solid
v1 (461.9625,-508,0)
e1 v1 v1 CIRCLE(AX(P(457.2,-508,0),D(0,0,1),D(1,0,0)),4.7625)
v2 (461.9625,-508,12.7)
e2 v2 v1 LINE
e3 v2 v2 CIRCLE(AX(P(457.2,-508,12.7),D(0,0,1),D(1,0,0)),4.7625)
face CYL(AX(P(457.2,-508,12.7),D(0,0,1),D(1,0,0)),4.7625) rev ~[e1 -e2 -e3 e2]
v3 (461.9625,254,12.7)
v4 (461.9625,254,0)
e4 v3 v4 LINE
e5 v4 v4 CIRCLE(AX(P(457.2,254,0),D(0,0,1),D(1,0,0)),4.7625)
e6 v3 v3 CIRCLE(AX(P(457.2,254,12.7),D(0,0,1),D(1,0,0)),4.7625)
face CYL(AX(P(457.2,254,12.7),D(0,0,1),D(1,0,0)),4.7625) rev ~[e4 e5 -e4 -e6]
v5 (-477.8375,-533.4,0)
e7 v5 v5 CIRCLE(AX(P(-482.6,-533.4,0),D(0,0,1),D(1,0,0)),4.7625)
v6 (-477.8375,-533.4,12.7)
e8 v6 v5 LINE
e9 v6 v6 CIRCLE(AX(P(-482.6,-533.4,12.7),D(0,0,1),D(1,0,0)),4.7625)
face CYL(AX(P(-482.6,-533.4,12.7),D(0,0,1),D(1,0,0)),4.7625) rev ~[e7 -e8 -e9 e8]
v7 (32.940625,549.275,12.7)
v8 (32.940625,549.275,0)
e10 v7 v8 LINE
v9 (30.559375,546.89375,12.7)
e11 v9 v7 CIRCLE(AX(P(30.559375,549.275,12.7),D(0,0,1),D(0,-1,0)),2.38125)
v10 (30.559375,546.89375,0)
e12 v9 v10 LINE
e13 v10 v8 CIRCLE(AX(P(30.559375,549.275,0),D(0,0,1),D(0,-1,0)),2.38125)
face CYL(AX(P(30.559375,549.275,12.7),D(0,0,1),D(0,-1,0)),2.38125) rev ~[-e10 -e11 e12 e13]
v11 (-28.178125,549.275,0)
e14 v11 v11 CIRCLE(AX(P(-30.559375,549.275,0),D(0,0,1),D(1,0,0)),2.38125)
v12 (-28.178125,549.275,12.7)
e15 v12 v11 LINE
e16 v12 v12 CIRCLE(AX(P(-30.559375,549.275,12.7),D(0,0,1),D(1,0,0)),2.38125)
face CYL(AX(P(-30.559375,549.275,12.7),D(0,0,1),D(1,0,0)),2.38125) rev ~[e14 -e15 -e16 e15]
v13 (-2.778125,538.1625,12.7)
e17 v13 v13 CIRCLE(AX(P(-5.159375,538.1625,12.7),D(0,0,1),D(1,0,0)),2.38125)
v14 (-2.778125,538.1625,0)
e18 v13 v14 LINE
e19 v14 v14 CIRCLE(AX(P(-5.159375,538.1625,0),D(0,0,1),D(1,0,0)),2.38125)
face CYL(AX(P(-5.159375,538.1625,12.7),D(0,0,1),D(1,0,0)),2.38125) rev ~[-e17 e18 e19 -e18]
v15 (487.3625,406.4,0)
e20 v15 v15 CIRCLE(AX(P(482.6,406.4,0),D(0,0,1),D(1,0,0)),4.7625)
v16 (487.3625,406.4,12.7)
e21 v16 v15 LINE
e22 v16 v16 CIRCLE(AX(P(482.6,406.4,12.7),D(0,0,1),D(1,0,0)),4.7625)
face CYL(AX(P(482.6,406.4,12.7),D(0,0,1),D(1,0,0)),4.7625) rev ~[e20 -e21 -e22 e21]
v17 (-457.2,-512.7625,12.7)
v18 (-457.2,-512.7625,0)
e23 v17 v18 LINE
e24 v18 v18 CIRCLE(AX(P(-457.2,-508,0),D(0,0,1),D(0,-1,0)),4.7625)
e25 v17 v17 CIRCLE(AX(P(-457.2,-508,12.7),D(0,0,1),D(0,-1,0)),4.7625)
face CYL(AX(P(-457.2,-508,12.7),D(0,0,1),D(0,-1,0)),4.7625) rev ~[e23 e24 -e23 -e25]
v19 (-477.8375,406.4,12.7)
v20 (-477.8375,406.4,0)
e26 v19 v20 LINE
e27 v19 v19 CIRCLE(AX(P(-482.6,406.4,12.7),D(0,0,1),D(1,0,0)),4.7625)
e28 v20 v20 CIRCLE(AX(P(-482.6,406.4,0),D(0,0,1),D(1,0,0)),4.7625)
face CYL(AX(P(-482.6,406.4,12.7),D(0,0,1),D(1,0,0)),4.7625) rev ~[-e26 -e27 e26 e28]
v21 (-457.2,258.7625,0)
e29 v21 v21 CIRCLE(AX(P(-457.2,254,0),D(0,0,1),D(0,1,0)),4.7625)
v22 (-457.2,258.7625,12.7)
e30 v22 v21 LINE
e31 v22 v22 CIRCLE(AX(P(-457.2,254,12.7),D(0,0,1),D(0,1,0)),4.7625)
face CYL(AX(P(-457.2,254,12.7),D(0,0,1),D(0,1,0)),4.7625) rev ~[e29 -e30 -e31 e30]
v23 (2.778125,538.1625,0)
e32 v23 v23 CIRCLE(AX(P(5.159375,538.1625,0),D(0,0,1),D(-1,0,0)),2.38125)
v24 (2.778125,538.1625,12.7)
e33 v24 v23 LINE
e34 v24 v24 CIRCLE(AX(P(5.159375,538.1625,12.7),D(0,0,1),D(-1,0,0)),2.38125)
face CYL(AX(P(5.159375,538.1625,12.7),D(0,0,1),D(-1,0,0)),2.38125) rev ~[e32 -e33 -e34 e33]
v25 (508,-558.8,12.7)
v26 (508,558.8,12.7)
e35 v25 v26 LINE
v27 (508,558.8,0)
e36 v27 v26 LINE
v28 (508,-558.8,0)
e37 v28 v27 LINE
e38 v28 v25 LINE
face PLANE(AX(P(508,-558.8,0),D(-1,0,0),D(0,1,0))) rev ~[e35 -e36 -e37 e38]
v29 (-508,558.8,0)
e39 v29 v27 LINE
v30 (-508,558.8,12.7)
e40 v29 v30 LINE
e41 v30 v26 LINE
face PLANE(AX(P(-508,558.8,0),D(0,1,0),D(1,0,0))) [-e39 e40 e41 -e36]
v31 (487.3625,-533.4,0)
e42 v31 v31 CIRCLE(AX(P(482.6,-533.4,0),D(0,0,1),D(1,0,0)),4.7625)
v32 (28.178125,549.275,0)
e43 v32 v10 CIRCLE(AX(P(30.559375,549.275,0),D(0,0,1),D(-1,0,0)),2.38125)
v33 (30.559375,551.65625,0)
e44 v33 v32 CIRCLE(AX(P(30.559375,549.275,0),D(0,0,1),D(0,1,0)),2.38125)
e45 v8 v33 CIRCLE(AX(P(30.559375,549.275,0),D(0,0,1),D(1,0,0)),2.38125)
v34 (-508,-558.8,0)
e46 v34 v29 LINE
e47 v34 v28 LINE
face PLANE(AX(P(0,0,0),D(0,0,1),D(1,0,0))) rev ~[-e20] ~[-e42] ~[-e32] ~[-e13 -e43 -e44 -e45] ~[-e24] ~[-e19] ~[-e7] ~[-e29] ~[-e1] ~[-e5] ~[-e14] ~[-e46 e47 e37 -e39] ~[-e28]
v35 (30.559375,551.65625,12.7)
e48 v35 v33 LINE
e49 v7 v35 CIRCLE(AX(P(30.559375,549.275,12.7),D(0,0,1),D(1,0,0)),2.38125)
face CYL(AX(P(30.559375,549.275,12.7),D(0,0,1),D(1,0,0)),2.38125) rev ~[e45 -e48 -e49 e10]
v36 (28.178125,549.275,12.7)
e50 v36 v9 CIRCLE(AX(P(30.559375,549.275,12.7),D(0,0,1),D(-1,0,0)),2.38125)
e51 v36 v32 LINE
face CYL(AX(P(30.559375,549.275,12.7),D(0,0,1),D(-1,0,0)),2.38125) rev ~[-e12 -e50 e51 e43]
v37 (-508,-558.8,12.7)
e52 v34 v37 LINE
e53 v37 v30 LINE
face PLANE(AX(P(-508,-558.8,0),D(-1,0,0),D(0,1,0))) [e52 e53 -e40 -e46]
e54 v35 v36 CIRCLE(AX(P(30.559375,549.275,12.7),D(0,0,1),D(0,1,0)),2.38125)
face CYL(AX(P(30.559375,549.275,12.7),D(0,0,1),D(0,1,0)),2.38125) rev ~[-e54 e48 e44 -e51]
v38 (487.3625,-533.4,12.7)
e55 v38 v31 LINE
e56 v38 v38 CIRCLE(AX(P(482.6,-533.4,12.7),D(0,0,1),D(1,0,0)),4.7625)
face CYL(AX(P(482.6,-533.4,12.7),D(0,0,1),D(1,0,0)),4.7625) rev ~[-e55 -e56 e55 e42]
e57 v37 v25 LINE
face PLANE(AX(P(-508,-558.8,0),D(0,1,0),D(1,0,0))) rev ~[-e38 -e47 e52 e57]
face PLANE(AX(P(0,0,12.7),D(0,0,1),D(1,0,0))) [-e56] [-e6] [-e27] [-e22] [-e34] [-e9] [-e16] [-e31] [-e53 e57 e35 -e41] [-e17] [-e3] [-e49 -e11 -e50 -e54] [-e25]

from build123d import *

# Parameters (mm, degrees)
F0_W     = 1016
F0_H     = 1117.6
F1_DEPTH = 12.7
F3_DEPTH = 25.4
F4_R     = 4.7625
F5_DEPTH = 25.4


# Not quite as in the source:
# - a feature names something its author has since deleted; it is built from what else it names


with BuildPart() as f1:
    # F0 (on Top) → F1 (new body)
    with BuildSketch(Plane.XY):
        Rectangle(F0_W, F0_H)
    extrude(amount=F1_DEPTH)

    # F2 (on face) → F3 (cut)
    with BuildSketch(Plane.XY.offset(12.7)):
        with BuildLine():
            Line((-30.559375, 549.275), (-30.559375, 551.65625))
            ThreePointArc((-30.559375, 551.65625), (-32.940625, 549.275), (-30.559375, 546.89375))
            Line((-30.559375, 546.89375), (-30.559375, 549.275))
        make_face()
        with BuildLine():
            ThreePointArc((-28.178125, 549.275), (-28.8755769773, 550.9587980227), (-30.559375, 551.65625))
            Line((-30.559375, 551.65625), (-30.559375, 549.275))
            Line((-30.559375, 549.275), (-28.178125, 549.275))
        make_face()
        with BuildLine():
            Line((-28.178125, 549.275), (-30.559375, 549.275))
            Line((-30.559375, 549.275), (-30.559375, 546.89375))
            ThreePointArc((-30.559375, 546.89375), (-28.8755769773, 547.5912019773), (-28.178125, 549.275))
        make_face()
        with BuildLine():
            Line((-5.159375, 538.1625), (-7.540625, 538.1625))
            ThreePointArc((-7.540625, 538.1625), (-5.159375, 535.78125), (-2.778125, 538.1625))
            Line((-2.778125, 538.1625), (-5.159375, 538.1625))
        make_face()
        with BuildLine():
            ThreePointArc((-2.778125, 538.1625), (-5.159375, 540.54375), (-7.540625, 538.1625))
            Line((-7.540625, 538.1625), (-5.159375, 538.1625))
            Line((-5.159375, 538.1625), (-2.778125, 538.1625))
        make_face()
        with BuildLine():
            Line((5.159375, 538.1625), (7.540625, 538.1625))
            ThreePointArc((7.540625, 538.1625), (5.159375, 540.54375), (2.778125, 538.1625))
            Line((2.778125, 538.1625), (5.159375, 538.1625))
        make_face()
        with BuildLine():
            ThreePointArc((2.778125, 538.1625), (5.159375, 535.78125), (7.540625, 538.1625))
            Line((7.540625, 538.1625), (5.159375, 538.1625))
            Line((5.159375, 538.1625), (2.778125, 538.1625))
        make_face()
        with BuildLine():
            Line((30.559375, 549.275), (30.559375, 551.65625))
            ThreePointArc((30.559375, 551.65625), (28.8755769773, 550.9587980227), (28.178125, 549.275))
            Line((28.178125, 549.275), (30.559375, 549.275))
        make_face()
        with BuildLine():
            Line((30.559375, 546.89375), (30.559375, 549.275))
            Line((30.559375, 549.275), (28.178125, 549.275))
            ThreePointArc((28.178125, 549.275), (28.8755769773, 547.5912019773), (30.559375, 546.89375))
        make_face()
        with BuildLine():
            ThreePointArc((32.940625, 549.275), (32.2431730227, 550.9587980227), (30.559375, 551.65625))
            Line((30.559375, 551.65625), (30.559375, 549.275))
            Line((30.559375, 549.275), (30.559375, 546.89375))
            ThreePointArc((30.559375, 546.89375), (32.2431730227, 547.5912019773), (32.940625, 549.275))
        make_face()
    extrude(amount=-F3_DEPTH, mode=Mode.SUBTRACT)

    # F4 (on face) → F5 (cut)
    with BuildSketch(Plane.XY.offset(12.7)):
        with Locations((-482.6, 406.4)):
            Circle(F4_R)
        with BuildLine():
            Line((-457.2, 254), (-461.9625, 254))
            ThreePointArc((-461.9625, 254), (-457.2, 249.2375), (-452.4375, 254))
            ThreePointArc((-452.4375, 254), (-453.8324039546, 257.3675960454), (-457.2, 258.7625))
            Line((-457.2, 258.7625), (-457.2, 254))
        make_face()
        with BuildLine():
            ThreePointArc((-457.2, 258.7625), (-460.5675960454, 257.3675960454), (-461.9625, 254))
            Line((-461.9625, 254), (-457.2, 254))
            Line((-457.2, 254), (-457.2, 258.7625))
        make_face()
        with Locations((-482.6, -533.4)):
            Circle(F4_R)
        with BuildLine():
            Line((-457.2, -508), (-457.2, -512.7625))
            ThreePointArc((-457.2, -512.7625), (-453.8324039546, -511.3675960454), (-452.4375, -508))
            ThreePointArc((-452.4375, -508), (-457.2, -503.2375), (-461.9625, -508))
            Line((-461.9625, -508), (-457.2, -508))
        make_face()
        with BuildLine():
            ThreePointArc((-461.9625, -508), (-460.5675960454, -511.3675960454), (-457.2, -512.7625))
            Line((-457.2, -512.7625), (-457.2, -508))
            Line((-457.2, -508), (-461.9625, -508))
        make_face()
        with Locations((482.6, -533.4)):
            Circle(F4_R)
        with BuildLine():
            Line((457.2, -508), (457.2, -512.7625))
            ThreePointArc((457.2, -512.7625), (460.5675960454, -511.3675960454), (461.9625, -508))
            Line((461.9625, -508), (457.2, -508))
        make_face()
        with BuildLine():
            ThreePointArc((461.9625, -508), (453.8324039546, -504.6324039546), (457.2, -512.7625))
            Line((457.2, -512.7625), (457.2, -508))
            Line((457.2, -508), (461.9625, -508))
        make_face()
        with BuildLine():
            ThreePointArc((457.2, 258.7625), (453.8324039546, 250.6324039546), (461.9625, 254))
            Line((461.9625, 254), (457.2, 254))
            Line((457.2, 254), (457.2, 258.7625))
        make_face()
        with BuildLine():
            Line((457.2, 254), (461.9625, 254))
            ThreePointArc((461.9625, 254), (460.5675960454, 257.3675960454), (457.2, 258.7625))
            Line((457.2, 258.7625), (457.2, 254))
        make_face()
        with Locations((482.6, 406.4)):
            Circle(F4_R)
    extrude(amount=-F5_DEPTH, mode=Mode.SUBTRACT)


solid = f1.part
